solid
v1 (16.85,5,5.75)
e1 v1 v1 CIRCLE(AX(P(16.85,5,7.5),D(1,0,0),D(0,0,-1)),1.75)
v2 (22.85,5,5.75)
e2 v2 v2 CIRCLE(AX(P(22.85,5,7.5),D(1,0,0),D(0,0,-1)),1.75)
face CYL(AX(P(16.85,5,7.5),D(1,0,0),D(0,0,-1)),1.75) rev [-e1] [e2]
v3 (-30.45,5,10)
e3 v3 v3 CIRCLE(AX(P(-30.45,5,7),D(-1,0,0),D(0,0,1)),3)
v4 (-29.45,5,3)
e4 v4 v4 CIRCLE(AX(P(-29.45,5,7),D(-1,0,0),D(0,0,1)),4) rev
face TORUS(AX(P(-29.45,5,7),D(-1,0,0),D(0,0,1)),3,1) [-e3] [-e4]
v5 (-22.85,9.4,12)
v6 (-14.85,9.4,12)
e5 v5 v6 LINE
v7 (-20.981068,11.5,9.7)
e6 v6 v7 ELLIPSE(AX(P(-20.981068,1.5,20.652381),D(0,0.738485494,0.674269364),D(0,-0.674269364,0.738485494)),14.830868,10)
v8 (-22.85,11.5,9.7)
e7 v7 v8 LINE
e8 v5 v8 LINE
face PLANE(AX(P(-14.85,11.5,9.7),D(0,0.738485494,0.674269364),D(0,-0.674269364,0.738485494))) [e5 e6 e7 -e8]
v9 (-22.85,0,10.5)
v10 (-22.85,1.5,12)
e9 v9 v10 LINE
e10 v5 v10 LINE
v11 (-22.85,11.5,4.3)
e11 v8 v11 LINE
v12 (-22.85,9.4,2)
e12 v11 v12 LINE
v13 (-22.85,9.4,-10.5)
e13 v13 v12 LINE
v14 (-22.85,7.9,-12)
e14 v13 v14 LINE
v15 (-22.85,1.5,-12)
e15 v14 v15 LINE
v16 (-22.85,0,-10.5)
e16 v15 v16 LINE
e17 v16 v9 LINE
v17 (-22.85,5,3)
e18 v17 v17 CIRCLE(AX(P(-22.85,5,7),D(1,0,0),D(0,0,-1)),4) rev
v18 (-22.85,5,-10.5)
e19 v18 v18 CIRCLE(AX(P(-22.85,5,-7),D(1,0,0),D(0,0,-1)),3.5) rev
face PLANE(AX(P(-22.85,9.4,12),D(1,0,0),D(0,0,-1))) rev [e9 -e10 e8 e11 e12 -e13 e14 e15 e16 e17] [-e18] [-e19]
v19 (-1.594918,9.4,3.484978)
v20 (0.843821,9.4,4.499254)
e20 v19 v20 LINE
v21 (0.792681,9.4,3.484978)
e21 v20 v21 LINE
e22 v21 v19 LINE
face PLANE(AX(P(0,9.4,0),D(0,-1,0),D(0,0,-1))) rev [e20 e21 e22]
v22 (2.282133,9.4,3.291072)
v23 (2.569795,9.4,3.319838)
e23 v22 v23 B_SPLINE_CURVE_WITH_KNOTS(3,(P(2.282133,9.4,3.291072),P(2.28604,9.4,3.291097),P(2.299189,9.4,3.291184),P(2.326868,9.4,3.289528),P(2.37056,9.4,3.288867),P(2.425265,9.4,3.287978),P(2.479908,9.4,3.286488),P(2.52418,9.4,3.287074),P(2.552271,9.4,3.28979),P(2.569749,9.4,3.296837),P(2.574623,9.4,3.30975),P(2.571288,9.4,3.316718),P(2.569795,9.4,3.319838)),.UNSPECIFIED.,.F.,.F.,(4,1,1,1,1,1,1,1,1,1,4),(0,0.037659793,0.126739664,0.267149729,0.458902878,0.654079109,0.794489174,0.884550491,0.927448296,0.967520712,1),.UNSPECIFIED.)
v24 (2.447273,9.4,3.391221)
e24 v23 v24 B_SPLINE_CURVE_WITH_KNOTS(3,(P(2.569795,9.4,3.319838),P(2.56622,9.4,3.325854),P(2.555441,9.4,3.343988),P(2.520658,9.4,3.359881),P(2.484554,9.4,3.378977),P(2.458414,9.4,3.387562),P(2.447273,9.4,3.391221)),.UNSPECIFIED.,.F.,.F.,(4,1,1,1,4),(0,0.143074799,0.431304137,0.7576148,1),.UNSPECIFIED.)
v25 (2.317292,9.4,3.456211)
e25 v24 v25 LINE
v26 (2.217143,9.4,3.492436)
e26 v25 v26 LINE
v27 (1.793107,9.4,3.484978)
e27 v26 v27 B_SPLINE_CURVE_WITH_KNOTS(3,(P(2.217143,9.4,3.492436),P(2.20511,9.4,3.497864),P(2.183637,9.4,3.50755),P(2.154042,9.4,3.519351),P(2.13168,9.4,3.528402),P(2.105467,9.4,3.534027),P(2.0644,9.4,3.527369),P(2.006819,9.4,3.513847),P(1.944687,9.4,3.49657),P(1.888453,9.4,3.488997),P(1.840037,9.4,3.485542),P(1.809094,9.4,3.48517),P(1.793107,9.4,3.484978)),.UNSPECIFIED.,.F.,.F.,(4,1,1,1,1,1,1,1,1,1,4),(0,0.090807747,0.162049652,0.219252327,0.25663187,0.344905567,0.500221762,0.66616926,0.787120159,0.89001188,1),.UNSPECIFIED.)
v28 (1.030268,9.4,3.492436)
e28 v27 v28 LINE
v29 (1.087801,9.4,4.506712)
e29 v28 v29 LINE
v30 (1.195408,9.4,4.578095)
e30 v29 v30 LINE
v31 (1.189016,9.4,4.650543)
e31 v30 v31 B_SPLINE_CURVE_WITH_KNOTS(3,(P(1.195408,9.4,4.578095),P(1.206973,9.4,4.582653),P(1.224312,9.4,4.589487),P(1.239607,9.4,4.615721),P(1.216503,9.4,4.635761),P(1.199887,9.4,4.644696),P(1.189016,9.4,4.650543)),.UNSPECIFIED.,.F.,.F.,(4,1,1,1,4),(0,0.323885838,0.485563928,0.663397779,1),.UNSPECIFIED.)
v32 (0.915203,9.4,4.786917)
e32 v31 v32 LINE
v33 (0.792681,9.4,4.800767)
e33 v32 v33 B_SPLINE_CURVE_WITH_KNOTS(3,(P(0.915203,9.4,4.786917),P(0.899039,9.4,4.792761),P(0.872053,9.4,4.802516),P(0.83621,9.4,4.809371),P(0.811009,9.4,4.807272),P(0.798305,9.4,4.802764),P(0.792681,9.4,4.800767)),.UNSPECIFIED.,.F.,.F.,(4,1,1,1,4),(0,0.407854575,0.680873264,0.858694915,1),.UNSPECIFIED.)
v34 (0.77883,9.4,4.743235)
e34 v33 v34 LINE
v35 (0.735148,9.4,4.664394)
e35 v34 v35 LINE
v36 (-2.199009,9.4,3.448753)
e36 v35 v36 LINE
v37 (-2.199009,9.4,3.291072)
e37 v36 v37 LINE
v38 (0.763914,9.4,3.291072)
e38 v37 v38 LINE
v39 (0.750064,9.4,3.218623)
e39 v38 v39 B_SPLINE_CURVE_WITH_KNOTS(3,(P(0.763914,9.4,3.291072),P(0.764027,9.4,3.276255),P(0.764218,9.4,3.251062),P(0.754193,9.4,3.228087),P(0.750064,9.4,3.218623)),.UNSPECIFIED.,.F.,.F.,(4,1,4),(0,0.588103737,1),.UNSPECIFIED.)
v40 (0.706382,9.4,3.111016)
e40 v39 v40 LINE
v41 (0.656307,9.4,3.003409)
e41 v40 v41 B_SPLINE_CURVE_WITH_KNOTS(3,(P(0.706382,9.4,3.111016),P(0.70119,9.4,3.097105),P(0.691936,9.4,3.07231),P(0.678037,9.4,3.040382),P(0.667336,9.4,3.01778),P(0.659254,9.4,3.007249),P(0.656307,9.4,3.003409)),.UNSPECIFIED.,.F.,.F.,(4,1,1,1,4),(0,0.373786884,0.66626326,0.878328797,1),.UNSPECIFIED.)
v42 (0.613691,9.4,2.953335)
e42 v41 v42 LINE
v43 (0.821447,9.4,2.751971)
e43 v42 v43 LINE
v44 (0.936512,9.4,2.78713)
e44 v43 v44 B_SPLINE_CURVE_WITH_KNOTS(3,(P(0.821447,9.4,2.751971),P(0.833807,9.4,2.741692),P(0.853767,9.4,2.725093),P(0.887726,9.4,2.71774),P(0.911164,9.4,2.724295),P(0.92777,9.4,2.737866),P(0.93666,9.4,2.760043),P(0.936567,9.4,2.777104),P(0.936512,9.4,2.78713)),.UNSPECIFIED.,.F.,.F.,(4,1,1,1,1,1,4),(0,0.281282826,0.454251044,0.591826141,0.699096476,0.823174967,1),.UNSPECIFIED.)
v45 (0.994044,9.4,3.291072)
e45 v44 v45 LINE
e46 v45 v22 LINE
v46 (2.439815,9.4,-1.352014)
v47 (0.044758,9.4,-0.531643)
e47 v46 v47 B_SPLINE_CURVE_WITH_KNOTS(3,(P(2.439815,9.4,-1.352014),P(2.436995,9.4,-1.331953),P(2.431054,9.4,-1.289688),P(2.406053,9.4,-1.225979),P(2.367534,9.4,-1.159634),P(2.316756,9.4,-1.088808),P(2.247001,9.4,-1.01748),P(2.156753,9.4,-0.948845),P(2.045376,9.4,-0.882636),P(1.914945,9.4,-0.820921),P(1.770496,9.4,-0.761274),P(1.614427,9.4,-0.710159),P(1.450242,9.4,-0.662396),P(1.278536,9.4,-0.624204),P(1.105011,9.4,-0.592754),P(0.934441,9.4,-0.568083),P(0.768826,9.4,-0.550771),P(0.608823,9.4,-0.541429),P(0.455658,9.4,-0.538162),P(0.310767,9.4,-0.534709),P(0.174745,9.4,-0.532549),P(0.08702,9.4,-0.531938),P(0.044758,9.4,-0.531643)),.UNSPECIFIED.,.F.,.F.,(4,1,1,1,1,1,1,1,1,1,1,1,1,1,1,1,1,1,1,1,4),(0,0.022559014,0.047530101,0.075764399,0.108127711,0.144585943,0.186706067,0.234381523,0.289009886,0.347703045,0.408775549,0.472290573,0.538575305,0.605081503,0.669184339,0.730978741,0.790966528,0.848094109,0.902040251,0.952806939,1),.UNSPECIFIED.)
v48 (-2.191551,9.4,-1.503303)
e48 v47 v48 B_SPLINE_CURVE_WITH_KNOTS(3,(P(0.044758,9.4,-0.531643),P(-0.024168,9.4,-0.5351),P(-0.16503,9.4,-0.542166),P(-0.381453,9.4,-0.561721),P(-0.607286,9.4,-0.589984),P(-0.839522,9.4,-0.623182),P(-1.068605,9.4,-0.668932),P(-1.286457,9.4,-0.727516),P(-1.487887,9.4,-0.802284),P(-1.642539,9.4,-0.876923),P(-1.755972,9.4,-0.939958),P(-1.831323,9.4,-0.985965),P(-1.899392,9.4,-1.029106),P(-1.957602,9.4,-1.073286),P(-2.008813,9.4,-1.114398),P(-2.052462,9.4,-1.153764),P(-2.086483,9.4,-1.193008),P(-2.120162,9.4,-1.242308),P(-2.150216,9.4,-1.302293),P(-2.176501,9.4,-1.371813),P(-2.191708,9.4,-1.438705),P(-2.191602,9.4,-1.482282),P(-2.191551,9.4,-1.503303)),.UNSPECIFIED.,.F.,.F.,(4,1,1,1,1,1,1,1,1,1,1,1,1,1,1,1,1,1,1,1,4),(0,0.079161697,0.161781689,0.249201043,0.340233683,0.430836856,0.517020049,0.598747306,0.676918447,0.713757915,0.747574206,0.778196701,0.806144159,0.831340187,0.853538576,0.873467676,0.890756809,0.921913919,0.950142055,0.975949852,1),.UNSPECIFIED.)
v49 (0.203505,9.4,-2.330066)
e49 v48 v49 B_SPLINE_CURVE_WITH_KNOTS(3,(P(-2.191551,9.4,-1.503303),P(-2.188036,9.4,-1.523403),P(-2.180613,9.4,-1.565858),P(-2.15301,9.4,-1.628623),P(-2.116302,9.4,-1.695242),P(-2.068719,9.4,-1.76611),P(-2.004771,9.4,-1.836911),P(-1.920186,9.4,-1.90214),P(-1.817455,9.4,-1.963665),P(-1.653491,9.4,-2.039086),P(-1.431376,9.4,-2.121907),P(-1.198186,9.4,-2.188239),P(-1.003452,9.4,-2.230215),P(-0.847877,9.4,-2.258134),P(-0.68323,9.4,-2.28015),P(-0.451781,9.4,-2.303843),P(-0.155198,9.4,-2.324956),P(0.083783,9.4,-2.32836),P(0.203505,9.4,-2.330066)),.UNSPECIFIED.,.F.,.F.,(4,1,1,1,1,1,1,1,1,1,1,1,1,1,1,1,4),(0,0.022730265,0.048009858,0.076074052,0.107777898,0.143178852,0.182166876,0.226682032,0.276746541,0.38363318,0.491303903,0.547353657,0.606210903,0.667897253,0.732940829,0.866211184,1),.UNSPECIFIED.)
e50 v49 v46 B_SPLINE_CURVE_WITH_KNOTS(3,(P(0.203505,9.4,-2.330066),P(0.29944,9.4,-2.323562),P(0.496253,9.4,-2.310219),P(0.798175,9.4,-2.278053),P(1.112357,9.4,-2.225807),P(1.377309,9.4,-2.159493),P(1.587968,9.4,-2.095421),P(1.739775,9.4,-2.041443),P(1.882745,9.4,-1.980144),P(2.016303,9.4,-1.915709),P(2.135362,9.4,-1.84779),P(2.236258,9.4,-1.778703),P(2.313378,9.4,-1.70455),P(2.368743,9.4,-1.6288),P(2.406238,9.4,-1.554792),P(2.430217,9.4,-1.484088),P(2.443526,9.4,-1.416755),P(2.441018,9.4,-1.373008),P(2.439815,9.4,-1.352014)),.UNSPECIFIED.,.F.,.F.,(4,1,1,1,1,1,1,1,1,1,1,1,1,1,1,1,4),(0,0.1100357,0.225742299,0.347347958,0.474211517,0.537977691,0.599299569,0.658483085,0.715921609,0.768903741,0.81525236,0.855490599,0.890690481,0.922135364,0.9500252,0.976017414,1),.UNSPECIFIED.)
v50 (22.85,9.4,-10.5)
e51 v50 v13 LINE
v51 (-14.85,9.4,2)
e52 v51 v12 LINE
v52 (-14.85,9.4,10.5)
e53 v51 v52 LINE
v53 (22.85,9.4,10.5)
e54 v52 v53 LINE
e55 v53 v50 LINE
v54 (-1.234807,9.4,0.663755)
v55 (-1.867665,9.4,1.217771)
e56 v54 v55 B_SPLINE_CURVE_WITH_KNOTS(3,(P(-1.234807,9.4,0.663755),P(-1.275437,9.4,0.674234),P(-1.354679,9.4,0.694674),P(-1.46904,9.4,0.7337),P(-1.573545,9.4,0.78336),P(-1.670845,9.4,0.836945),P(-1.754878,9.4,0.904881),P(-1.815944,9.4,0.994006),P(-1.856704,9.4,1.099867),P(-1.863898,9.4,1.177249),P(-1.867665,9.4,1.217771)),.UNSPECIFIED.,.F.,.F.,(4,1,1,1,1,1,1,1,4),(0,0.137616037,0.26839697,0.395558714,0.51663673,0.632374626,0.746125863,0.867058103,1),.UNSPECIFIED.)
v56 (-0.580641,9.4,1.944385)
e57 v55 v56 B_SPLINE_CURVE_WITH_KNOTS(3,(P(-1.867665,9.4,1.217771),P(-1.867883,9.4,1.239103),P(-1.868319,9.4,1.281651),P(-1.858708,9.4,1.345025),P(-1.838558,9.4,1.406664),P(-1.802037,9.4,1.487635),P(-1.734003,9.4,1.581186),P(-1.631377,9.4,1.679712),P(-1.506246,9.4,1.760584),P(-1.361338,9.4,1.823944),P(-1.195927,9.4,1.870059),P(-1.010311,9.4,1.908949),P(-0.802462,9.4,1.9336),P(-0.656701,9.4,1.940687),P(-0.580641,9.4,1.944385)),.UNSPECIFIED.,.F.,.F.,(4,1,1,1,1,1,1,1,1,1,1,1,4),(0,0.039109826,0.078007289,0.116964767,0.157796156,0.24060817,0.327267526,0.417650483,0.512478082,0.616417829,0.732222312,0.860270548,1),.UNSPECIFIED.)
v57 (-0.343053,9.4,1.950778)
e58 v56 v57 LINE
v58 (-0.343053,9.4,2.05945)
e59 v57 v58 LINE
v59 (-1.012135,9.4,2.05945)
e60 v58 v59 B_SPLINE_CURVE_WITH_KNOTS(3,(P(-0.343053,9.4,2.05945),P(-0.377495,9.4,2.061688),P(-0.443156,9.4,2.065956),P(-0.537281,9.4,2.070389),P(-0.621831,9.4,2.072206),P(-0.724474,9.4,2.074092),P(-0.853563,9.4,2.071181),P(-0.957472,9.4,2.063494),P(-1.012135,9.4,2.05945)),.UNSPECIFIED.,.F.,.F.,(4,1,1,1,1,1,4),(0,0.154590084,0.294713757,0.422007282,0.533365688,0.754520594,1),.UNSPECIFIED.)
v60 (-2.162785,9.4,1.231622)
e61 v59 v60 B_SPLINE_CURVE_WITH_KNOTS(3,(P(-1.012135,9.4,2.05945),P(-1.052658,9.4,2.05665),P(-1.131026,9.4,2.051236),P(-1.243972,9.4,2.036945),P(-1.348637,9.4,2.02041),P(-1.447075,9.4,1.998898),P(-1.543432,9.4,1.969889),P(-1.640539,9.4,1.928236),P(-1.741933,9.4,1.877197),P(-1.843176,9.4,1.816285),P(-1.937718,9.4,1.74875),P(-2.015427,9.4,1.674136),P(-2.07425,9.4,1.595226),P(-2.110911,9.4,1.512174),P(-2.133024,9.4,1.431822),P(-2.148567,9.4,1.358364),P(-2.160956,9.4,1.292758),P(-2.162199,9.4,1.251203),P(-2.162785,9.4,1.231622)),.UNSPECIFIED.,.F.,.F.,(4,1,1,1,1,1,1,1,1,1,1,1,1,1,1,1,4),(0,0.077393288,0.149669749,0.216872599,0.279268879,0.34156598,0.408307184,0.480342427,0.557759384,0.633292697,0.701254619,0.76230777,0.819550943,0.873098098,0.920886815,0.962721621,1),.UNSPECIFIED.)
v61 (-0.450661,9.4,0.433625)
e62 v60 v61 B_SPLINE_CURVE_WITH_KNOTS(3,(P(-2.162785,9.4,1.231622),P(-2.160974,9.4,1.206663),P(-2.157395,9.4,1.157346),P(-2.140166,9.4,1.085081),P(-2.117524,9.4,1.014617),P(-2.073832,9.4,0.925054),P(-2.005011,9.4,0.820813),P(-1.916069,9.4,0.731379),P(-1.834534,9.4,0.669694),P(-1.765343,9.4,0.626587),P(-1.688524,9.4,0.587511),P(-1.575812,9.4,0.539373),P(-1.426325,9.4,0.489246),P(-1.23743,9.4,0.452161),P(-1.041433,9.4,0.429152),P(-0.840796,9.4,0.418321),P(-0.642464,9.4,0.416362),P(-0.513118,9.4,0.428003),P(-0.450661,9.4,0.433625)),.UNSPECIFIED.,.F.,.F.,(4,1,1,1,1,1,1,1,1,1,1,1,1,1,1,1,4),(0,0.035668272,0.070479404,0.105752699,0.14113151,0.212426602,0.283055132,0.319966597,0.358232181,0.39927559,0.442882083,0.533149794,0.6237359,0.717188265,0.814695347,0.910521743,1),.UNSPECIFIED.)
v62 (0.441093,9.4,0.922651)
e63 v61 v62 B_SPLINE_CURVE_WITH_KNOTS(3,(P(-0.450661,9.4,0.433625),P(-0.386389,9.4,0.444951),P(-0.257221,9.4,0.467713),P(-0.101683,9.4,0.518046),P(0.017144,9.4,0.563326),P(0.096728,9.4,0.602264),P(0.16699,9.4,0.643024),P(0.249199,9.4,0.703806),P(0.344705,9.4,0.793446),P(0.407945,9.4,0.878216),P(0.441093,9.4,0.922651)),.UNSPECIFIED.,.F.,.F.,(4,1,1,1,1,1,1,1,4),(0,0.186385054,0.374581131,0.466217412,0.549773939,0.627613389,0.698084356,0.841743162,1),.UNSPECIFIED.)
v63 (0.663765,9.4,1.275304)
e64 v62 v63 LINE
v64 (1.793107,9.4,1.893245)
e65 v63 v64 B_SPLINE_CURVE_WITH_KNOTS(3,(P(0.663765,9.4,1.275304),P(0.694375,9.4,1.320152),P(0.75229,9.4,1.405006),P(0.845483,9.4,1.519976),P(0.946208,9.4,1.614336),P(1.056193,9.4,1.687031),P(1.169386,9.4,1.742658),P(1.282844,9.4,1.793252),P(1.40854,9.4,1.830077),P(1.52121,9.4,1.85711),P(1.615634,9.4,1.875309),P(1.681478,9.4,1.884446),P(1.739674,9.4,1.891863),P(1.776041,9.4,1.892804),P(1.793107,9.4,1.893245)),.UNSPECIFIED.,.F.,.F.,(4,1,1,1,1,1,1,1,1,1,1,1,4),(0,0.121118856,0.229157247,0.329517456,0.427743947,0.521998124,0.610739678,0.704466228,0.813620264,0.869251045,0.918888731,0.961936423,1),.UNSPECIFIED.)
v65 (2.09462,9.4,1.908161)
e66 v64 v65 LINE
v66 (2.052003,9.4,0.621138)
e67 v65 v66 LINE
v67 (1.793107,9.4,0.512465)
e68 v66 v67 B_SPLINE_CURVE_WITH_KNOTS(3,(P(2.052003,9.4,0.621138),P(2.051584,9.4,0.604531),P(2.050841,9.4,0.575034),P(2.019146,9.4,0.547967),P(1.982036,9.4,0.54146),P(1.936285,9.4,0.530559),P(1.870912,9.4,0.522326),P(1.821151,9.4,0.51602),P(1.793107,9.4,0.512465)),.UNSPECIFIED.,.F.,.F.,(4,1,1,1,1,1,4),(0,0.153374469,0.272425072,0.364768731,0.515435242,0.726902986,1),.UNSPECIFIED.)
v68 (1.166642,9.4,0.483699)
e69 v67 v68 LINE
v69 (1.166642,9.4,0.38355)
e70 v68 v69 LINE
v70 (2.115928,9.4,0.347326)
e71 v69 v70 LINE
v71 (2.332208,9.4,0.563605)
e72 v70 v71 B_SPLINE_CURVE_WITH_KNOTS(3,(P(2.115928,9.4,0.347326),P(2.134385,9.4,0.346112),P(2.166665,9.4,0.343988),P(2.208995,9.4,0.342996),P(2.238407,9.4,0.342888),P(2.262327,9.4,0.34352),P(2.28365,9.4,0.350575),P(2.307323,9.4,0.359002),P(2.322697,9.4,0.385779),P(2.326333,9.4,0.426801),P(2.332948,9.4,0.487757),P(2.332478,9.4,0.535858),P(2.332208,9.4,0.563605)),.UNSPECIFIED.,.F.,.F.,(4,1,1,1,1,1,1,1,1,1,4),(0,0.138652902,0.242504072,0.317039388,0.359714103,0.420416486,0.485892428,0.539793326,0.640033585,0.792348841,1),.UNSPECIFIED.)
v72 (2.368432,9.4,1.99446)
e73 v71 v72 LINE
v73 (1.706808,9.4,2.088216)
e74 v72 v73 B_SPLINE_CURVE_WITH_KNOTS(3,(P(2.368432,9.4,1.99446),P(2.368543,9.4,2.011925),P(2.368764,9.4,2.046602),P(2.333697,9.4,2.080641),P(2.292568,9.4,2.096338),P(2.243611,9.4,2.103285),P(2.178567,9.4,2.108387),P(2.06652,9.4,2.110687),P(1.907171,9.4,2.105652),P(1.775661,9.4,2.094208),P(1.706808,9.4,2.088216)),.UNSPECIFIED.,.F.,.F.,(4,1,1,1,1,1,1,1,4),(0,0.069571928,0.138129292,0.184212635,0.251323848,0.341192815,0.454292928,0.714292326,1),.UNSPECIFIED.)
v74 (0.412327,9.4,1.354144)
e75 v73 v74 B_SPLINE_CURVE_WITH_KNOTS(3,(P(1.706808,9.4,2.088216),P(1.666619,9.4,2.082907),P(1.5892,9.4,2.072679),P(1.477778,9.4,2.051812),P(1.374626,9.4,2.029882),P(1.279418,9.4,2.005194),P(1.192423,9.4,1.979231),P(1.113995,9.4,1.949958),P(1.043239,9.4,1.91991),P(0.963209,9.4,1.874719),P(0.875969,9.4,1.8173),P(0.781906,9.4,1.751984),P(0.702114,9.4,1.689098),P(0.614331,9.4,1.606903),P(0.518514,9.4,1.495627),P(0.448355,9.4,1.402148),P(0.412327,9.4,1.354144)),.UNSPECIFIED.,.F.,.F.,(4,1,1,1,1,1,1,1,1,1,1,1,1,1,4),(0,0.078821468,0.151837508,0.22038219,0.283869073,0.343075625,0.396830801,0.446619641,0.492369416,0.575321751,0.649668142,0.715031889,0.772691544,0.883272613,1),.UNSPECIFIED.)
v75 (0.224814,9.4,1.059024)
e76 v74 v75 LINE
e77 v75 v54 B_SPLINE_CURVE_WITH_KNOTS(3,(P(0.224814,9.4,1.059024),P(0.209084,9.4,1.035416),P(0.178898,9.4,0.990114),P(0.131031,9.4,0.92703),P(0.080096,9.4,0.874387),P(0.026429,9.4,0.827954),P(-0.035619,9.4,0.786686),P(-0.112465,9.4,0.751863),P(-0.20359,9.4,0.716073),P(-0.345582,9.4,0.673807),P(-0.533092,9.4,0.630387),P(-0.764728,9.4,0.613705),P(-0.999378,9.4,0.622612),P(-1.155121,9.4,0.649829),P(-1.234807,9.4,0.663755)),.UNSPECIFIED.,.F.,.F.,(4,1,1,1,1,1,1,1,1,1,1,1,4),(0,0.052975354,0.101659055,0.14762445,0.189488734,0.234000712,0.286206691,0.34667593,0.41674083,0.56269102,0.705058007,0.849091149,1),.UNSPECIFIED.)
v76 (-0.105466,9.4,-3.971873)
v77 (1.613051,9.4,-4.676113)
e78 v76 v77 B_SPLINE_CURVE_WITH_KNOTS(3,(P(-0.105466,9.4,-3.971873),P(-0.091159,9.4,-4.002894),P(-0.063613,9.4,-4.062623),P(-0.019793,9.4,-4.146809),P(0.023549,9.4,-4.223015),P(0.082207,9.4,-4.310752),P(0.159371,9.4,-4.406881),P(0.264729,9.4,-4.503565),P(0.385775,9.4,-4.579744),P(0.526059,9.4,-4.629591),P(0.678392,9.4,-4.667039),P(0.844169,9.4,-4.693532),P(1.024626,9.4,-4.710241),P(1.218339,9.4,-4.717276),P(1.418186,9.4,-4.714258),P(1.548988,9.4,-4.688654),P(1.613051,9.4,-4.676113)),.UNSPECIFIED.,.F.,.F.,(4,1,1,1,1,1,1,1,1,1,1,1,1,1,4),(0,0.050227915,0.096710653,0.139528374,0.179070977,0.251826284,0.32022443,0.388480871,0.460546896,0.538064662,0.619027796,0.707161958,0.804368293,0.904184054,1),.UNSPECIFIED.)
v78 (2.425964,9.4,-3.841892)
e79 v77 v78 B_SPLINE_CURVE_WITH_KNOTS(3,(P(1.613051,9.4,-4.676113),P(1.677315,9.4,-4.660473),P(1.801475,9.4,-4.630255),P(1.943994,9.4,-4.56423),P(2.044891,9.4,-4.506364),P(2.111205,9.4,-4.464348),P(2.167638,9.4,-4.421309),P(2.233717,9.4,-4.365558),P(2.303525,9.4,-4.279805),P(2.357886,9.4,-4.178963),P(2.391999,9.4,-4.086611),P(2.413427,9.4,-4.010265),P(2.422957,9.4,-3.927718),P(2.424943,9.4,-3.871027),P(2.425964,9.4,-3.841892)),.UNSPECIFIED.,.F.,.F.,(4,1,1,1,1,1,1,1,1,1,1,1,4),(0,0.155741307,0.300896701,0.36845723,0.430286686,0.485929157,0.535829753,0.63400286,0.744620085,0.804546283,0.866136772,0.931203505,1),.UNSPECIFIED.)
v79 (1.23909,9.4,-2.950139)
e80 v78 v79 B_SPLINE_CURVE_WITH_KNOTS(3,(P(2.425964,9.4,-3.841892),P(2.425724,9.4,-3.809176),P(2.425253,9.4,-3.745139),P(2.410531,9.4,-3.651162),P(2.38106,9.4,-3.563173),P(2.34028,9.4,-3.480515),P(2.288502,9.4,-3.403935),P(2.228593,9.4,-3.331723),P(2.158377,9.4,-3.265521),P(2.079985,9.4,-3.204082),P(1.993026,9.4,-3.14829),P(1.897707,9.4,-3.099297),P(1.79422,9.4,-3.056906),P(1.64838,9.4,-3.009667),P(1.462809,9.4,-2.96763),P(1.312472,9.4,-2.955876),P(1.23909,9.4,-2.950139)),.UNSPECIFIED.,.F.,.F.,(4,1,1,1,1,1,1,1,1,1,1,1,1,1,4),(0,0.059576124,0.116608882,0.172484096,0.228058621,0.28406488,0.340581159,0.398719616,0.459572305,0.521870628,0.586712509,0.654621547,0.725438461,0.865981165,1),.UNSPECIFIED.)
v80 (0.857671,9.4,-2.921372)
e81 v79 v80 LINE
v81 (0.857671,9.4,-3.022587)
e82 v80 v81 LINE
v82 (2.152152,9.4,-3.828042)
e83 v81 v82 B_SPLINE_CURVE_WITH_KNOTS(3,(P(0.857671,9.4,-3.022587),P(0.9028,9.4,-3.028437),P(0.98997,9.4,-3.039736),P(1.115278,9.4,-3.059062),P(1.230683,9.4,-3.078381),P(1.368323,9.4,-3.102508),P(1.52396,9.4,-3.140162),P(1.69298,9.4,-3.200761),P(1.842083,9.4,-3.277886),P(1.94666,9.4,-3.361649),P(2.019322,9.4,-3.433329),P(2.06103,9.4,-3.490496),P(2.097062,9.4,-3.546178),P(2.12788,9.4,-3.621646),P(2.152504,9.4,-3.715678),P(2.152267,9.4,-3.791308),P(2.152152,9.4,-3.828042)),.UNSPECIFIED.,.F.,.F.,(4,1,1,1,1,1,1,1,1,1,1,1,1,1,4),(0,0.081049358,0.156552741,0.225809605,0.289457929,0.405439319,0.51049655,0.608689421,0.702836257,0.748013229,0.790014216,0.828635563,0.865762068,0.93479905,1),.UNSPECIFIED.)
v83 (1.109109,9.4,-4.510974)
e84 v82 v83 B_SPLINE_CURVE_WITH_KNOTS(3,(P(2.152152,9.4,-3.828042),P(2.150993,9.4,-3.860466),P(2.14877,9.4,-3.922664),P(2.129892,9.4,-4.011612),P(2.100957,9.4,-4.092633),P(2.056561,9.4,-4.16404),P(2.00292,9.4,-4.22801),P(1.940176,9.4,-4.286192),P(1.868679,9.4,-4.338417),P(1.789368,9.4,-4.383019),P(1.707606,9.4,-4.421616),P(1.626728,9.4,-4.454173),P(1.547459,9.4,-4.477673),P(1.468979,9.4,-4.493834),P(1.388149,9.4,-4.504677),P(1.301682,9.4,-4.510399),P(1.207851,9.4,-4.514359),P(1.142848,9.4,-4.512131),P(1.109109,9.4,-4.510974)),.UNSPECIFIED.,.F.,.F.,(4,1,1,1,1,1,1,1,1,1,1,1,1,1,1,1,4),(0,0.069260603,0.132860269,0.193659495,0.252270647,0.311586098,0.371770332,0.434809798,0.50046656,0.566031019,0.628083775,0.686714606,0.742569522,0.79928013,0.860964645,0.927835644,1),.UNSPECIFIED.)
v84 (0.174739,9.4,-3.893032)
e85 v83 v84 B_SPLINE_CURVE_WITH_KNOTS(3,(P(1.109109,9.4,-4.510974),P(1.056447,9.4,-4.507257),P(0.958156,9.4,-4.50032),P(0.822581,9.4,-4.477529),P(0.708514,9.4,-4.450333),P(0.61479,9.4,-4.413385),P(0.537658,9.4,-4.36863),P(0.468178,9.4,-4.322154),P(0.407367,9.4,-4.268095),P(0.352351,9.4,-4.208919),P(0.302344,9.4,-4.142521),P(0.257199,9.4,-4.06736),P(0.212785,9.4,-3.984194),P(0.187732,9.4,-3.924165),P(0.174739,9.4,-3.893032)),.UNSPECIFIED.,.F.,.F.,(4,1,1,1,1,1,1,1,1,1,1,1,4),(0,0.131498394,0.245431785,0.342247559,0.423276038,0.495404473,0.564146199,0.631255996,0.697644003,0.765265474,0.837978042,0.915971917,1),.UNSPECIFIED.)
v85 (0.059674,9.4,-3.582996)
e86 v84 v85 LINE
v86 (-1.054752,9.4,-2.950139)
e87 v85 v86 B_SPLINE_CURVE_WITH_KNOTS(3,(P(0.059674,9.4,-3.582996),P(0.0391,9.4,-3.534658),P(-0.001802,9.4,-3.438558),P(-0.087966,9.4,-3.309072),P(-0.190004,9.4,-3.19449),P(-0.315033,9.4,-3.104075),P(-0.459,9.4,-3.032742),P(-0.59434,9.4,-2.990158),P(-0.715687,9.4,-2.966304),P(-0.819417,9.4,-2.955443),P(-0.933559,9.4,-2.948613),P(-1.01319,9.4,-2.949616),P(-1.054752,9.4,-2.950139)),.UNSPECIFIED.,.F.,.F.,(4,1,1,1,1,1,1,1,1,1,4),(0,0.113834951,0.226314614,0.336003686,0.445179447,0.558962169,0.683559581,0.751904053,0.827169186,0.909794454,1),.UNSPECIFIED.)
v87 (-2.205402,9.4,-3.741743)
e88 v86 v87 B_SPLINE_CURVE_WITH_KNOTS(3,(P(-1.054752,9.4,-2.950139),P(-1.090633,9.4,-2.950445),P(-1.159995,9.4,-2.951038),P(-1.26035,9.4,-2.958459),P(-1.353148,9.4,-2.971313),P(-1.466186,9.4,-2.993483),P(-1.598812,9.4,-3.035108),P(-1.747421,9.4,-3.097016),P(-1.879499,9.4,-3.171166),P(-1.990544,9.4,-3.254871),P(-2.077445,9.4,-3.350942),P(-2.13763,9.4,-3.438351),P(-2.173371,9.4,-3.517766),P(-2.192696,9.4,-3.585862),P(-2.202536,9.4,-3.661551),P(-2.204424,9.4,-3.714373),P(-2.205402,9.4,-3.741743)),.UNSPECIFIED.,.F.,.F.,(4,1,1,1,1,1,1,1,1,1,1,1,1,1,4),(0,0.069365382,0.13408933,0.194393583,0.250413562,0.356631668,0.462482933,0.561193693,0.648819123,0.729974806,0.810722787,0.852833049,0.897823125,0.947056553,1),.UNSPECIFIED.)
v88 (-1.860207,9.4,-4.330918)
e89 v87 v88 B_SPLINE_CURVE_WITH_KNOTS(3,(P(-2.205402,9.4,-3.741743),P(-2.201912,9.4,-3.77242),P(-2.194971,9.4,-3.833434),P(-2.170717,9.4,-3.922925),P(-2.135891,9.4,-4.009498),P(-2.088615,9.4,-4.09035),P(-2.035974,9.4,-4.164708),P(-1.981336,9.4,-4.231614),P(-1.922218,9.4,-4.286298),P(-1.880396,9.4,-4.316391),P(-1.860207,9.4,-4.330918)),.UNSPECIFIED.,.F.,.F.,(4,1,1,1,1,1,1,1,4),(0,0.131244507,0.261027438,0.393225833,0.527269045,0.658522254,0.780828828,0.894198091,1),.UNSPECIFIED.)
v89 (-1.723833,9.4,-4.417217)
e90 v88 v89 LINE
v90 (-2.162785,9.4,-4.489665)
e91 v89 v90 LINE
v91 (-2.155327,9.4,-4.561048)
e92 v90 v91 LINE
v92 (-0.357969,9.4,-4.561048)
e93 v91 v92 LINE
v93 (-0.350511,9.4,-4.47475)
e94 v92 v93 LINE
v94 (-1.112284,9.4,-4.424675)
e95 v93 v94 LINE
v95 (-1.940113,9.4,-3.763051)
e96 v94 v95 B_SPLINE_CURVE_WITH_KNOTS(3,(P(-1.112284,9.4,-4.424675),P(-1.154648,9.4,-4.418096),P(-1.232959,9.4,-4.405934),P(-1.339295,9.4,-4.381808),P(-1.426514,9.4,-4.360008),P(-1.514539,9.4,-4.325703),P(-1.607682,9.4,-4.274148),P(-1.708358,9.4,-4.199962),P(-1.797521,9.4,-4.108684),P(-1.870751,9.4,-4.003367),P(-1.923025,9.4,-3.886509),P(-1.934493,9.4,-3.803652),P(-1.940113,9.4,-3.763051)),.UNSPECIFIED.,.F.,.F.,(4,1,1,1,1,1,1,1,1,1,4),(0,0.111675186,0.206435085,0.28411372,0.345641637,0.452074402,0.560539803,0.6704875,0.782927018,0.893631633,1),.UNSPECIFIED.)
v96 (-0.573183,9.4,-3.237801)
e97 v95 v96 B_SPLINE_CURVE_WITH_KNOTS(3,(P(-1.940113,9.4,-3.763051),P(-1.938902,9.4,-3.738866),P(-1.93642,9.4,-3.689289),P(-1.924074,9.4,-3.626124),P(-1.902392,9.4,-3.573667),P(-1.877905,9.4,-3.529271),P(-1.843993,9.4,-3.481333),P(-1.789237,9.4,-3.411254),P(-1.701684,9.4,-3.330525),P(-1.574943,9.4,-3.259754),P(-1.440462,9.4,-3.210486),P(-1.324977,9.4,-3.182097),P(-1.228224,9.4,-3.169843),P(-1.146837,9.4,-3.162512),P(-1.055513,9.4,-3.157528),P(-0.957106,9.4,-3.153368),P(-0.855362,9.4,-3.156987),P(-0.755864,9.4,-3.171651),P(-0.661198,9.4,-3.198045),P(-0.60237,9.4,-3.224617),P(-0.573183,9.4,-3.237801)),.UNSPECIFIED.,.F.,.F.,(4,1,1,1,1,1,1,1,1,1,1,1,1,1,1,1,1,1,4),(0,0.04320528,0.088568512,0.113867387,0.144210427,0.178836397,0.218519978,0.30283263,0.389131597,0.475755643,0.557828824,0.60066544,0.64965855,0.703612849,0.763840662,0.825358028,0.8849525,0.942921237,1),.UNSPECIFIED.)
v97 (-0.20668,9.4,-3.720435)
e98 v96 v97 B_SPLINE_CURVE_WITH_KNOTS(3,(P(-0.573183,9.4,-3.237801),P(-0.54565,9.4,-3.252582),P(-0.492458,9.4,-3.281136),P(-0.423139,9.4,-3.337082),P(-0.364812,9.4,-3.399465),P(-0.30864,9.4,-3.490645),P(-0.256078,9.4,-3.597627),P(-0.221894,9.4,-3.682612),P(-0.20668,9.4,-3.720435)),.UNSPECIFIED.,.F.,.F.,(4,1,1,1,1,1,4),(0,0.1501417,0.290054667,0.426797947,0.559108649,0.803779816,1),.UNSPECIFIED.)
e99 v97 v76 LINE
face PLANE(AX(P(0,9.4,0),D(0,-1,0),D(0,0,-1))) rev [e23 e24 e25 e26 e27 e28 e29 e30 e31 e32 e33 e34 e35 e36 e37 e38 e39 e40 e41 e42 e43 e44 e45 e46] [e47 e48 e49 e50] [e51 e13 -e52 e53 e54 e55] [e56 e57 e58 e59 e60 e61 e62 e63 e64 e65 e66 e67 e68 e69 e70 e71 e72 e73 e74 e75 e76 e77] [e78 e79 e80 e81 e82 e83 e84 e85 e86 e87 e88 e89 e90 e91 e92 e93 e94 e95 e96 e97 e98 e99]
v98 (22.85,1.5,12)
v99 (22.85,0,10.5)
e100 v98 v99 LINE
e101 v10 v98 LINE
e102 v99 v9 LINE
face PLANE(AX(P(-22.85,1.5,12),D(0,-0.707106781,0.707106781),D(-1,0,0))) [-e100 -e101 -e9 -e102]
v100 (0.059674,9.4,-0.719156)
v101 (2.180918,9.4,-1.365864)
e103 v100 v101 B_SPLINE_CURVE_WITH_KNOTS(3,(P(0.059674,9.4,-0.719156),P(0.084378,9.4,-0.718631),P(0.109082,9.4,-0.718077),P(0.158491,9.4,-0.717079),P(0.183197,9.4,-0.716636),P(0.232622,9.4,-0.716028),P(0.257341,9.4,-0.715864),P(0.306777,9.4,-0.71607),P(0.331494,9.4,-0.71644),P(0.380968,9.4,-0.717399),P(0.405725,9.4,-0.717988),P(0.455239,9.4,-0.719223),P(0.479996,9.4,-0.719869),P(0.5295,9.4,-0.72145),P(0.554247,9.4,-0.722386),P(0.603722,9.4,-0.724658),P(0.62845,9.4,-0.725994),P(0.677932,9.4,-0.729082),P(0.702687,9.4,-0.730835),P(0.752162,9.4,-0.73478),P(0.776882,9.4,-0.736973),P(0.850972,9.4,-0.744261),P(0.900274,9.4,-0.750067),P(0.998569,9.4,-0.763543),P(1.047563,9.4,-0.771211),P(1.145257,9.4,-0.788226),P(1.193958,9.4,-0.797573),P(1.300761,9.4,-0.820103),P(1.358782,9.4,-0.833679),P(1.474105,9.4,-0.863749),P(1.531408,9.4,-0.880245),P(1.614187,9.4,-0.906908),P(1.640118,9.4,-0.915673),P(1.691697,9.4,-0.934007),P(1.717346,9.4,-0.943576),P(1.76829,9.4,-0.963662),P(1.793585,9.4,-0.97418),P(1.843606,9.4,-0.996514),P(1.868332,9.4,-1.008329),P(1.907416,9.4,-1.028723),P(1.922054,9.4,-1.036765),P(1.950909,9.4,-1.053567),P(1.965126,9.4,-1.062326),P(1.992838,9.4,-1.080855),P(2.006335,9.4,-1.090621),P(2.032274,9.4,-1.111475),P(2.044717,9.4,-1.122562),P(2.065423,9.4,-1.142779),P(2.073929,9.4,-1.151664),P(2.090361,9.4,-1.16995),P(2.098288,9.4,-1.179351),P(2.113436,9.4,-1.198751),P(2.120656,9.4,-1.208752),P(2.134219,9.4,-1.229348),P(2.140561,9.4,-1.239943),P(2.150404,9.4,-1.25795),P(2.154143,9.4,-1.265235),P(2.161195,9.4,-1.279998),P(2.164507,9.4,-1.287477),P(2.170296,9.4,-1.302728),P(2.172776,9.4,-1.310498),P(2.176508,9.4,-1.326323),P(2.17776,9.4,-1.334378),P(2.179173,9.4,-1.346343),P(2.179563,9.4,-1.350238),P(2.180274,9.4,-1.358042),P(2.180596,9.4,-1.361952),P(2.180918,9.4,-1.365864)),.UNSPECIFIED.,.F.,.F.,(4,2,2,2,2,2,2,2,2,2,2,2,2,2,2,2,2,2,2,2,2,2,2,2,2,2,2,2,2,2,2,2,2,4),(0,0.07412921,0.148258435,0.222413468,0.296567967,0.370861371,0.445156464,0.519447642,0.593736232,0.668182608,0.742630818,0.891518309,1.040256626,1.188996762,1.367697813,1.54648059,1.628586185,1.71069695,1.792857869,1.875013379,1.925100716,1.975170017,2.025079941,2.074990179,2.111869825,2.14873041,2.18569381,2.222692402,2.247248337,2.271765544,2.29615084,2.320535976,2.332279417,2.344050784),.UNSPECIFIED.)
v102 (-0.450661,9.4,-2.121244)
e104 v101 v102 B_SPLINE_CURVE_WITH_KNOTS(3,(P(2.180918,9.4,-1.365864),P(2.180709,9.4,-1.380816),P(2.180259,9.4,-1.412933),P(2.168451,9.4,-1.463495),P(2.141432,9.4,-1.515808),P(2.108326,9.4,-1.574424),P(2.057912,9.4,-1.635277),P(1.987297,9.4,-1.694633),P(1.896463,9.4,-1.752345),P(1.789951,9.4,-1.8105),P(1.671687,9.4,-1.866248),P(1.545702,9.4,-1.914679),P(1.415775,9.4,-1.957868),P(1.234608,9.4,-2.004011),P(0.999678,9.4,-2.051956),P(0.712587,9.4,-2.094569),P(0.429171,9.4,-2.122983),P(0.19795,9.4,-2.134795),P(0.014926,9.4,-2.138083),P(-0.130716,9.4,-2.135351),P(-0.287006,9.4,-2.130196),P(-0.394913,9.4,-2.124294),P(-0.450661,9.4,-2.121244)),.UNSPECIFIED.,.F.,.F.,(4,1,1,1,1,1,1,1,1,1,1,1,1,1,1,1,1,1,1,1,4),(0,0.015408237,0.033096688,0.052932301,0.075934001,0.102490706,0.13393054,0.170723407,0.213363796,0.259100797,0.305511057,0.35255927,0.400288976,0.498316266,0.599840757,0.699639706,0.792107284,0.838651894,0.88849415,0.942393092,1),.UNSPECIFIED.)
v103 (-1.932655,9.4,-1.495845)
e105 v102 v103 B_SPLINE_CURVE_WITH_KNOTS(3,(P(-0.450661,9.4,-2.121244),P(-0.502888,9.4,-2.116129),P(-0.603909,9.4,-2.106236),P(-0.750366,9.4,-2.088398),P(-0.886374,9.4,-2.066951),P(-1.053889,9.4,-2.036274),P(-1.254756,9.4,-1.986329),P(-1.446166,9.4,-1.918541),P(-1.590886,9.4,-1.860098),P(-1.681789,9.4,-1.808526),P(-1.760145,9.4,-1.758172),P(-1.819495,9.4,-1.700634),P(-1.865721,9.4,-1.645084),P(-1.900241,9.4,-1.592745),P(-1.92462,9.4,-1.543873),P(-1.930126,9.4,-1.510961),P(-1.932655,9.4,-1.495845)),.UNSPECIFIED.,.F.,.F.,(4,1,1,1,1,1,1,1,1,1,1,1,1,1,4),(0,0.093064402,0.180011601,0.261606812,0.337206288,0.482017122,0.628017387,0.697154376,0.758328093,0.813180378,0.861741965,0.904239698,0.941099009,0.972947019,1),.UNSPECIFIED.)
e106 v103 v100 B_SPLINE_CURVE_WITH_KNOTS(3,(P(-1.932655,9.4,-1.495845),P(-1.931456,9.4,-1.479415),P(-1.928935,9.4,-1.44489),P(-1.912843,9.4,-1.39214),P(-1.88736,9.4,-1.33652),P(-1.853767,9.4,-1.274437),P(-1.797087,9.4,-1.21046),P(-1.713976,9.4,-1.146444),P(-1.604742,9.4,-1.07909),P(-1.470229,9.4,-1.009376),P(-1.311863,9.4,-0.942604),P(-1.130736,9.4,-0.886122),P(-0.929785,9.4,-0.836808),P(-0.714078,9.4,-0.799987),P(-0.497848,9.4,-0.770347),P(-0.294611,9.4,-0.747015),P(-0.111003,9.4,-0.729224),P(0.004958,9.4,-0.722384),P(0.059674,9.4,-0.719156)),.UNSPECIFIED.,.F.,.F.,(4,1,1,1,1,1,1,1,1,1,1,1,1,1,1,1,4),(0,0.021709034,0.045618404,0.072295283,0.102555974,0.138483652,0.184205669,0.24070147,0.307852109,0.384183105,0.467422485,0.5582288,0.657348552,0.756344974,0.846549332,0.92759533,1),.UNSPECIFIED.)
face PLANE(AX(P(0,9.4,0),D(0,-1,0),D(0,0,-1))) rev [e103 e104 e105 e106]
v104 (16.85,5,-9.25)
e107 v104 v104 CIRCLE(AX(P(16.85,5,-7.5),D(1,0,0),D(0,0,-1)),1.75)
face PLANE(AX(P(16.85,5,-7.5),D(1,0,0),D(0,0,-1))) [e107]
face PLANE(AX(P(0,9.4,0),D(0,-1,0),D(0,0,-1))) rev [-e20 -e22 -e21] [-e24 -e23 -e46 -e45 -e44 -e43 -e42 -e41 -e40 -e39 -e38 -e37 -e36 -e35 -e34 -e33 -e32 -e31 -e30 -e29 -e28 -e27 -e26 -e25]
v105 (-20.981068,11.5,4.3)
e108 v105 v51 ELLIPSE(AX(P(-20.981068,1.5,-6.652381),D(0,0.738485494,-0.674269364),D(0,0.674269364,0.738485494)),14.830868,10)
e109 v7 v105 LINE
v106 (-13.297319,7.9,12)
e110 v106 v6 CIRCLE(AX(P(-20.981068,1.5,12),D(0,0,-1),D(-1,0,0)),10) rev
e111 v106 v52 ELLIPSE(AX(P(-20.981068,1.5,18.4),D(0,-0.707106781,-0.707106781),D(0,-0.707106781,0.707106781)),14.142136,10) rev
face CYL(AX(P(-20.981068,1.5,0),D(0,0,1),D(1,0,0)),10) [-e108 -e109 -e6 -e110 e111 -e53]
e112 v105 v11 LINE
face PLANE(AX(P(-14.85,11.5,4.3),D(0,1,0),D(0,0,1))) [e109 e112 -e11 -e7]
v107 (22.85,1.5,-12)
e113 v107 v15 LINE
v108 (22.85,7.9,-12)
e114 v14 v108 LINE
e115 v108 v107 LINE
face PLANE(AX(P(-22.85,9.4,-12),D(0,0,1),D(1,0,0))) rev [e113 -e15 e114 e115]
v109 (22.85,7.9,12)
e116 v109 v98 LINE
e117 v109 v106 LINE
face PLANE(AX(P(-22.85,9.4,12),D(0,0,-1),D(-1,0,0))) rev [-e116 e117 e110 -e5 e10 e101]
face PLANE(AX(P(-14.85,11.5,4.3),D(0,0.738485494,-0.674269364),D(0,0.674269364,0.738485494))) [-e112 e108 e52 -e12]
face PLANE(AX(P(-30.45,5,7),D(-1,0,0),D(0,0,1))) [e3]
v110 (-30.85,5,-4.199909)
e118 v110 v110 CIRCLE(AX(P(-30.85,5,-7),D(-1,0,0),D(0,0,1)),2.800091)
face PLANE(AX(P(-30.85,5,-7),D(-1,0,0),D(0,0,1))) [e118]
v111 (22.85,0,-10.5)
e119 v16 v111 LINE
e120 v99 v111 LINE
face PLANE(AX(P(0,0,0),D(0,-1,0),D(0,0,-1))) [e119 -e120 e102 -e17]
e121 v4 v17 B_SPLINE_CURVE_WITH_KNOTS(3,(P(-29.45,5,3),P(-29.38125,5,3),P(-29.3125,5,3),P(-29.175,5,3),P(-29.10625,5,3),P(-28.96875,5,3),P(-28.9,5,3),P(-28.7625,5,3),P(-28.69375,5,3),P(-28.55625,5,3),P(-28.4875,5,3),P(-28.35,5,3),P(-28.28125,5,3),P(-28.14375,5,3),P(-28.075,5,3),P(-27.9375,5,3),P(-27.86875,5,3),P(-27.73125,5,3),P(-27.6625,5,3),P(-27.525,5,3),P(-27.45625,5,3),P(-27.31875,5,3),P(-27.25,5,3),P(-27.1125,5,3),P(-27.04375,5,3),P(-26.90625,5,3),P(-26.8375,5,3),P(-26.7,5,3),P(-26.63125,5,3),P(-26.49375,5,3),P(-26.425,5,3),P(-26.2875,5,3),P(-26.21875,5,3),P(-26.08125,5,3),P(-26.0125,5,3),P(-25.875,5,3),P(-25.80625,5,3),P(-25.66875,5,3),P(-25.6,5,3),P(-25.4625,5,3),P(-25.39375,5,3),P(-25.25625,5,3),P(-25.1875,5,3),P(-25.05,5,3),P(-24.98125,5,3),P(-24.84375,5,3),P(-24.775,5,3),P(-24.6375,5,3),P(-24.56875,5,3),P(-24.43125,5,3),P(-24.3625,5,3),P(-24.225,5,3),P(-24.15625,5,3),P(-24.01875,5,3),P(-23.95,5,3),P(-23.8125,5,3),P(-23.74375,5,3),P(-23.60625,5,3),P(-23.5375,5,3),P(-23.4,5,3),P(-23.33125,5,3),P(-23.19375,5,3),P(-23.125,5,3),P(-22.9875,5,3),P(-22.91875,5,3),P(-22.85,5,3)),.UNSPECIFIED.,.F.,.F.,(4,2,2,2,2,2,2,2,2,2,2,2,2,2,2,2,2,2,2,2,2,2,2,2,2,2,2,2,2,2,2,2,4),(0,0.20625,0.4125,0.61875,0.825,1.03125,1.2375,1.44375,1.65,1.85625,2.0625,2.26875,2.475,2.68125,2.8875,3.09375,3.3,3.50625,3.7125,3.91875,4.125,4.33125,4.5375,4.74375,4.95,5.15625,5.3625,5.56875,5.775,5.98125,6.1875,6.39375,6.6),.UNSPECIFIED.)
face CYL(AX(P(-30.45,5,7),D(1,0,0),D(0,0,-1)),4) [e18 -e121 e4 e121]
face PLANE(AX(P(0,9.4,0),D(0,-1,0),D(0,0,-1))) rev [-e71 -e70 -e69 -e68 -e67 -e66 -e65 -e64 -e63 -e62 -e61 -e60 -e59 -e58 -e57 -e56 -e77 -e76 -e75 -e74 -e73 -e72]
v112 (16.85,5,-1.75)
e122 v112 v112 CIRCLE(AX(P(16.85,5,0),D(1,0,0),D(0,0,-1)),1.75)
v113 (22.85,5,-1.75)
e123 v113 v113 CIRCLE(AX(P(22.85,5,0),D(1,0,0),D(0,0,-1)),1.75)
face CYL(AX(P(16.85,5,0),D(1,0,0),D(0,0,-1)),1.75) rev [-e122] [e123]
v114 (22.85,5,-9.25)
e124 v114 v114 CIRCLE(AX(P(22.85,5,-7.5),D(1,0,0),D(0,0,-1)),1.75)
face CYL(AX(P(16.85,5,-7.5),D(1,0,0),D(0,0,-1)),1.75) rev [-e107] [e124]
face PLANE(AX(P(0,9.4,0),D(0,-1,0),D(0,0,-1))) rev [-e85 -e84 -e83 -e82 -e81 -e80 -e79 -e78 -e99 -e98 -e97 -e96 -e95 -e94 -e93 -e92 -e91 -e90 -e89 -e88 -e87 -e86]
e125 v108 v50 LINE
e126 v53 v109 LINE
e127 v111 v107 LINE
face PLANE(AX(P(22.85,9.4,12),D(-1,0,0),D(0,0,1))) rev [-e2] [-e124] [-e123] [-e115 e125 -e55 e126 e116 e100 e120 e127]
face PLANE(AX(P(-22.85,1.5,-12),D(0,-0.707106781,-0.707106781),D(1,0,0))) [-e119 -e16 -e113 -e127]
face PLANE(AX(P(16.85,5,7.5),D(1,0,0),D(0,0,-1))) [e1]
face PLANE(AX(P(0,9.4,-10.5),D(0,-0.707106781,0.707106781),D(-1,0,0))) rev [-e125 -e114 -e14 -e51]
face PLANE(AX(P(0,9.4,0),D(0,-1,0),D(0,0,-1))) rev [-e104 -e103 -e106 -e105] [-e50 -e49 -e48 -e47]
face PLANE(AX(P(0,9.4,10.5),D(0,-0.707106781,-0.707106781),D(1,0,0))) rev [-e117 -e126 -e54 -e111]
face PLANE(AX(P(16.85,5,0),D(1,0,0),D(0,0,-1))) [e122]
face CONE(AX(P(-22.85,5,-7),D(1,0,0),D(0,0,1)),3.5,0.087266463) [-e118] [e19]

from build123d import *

# Parameters (mm, degrees)
SKETCH_1_W          = 45.7
SKETCH_1_H          = 24
EXTRUDE_1_DEPTH     = 9.4
SKETCH_2_R          = 1.75
CUT_EXTRUDE_1_DEPTH = 6
SKETCH_3_R          = 4
EXTRUDE_2_DEPTH     = 7.6
EXTRUDE_3_DEPTH     = 8
FILLET_1_R          = 10
CHAMFER_1_SIZE      = 1.5
SKETCH_5_R          = 3.5
EXTRUDE_4_DEPTH     = 8
EXTRUDE_4_TAPER     = 5
FILLET_2_R          = 1


with BuildPart() as part:
    # 草图1 → 凸台-拉伸1 (new body)
    with BuildSketch(Plane(origin=(0, 0, 0), x_dir=(1, 0, 0), z_dir=(0, 1, 0))):
        Rectangle(SKETCH_1_W, SKETCH_1_H)
    extrude(amount=EXTRUDE_1_DEPTH)

    # 草图2 → 切除-拉伸1 (cut)
    with BuildSketch(Plane(origin=(22.85, 0, 0), x_dir=(0, 0, -1), z_dir=(1, 0, 0))):
        with Locations((-7.5, 5)):
            Circle(SKETCH_2_R)
        with Locations((0, 5)):
            Circle(SKETCH_2_R)
        with Locations((7.5, 5)):
            Circle(SKETCH_2_R)
    extrude(amount=-CUT_EXTRUDE_1_DEPTH, mode=Mode.SUBTRACT)

    # 草图3 → 凸台-拉伸2 (add)
    with BuildSketch(Plane.ZY.offset(22.85)):
        with Locations(Location((7, 5, 0), (0, 0, 180))):
            Circle(SKETCH_3_R)
    extrude(amount=EXTRUDE_2_DEPTH)

    # 草图4 → 凸台-拉伸3 (add)
    with BuildSketch(Plane.ZY.offset(22.85)):
        Polygon((4.3, 11.5), (9.7, 11.5), (12, 9.4), (2, 9.4), align=None)
    extrude(amount=-EXTRUDE_3_DEPTH)

    # 圆角1
    # the kernel refuses this fillet: 10 mm, written as the material it takes off along each edge
    with BuildSketch(Plane(origin=(-14.85, 11.5, -11.027671056), x_dir=(-1, 0, 0), z_dir=(0, 0, 1))) as fillet_1_piece_1:
        with BuildLine():
            CenterArc((6.131068422, 10), FILLET_1_R, 232.185511494, 37.814488506)
            Line((0, 2.1), (0, 0))
            Line((0, 0), (6.131068422, 0))
        make_face()
    extrude(amount=36.055342112, mode=Mode.SUBTRACT)

    # 倒角1
    # the kernel refuses this chamfer: 1.5 mm, written as the material it takes off along each edge
    with BuildSketch(Plane(origin=(-18.707524482, 9.4, 12), x_dir=(0, -1, 0), z_dir=(1, 0, 0))) as chamfer_1_piece_1_section:
        Polygon((CHAMFER_1_SIZE, 0), (0, CHAMFER_1_SIZE), (0, 0), align=None)
    chamfer_1_piece_1 = extrude(amount=45.415048964, mode=Mode.PRIVATE)
    chamfer_1_piece_1 = chamfer_1_piece_1 - Plane(origin=(-20.981068422, 1.5, 12), x_dir=(-1, 0, 0), z_dir=(0, 0, -1)) * Cylinder(10, 97, mode=Mode.PRIVATE)
    add(chamfer_1_piece_1, mode=Mode.SUBTRACT)
    with BuildSketch(Plane(origin=(-26.707524482, 0, 12), x_dir=(0, 1, 0), z_dir=(1, 0, 0)), Plane(origin=(26.707524482, 9.4, -12), x_dir=(0, 0, 1), z_dir=(-1, 0, 0))) as chamfer_1_piece_2:
        Polygon((CHAMFER_1_SIZE, 0), (0, -CHAMFER_1_SIZE), (0, 0), align=None)
    extrude(amount=53.415048964, mode=Mode.SUBTRACT)
    with BuildSketch(Plane(origin=(26.707524482, 0, -12), x_dir=(0, 0, 1), z_dir=(-1, 0, 0))) as chamfer_1_piece_3:
        Polygon((CHAMFER_1_SIZE, 0), (0, CHAMFER_1_SIZE), (0, 0), align=None)
    extrude(amount=53.415048964, mode=Mode.SUBTRACT)

    # 草图5 → 凸台-拉伸4 (add)
    with BuildSketch(Plane.ZY.offset(22.85)):
        with Locations((-7, 5)):
            Circle(SKETCH_5_R)
    extrude(amount=EXTRUDE_4_DEPTH, taper=EXTRUDE_4_TAPER)

    # 圆角2
    fillet_2_edges = [part.edges().sort_by_distance(p)[0] for p in [
        (-30.45, 5, 11),
    ]]
    fillet(fillet_2_edges, radius=FILLET_2_R)


solid = part.part
